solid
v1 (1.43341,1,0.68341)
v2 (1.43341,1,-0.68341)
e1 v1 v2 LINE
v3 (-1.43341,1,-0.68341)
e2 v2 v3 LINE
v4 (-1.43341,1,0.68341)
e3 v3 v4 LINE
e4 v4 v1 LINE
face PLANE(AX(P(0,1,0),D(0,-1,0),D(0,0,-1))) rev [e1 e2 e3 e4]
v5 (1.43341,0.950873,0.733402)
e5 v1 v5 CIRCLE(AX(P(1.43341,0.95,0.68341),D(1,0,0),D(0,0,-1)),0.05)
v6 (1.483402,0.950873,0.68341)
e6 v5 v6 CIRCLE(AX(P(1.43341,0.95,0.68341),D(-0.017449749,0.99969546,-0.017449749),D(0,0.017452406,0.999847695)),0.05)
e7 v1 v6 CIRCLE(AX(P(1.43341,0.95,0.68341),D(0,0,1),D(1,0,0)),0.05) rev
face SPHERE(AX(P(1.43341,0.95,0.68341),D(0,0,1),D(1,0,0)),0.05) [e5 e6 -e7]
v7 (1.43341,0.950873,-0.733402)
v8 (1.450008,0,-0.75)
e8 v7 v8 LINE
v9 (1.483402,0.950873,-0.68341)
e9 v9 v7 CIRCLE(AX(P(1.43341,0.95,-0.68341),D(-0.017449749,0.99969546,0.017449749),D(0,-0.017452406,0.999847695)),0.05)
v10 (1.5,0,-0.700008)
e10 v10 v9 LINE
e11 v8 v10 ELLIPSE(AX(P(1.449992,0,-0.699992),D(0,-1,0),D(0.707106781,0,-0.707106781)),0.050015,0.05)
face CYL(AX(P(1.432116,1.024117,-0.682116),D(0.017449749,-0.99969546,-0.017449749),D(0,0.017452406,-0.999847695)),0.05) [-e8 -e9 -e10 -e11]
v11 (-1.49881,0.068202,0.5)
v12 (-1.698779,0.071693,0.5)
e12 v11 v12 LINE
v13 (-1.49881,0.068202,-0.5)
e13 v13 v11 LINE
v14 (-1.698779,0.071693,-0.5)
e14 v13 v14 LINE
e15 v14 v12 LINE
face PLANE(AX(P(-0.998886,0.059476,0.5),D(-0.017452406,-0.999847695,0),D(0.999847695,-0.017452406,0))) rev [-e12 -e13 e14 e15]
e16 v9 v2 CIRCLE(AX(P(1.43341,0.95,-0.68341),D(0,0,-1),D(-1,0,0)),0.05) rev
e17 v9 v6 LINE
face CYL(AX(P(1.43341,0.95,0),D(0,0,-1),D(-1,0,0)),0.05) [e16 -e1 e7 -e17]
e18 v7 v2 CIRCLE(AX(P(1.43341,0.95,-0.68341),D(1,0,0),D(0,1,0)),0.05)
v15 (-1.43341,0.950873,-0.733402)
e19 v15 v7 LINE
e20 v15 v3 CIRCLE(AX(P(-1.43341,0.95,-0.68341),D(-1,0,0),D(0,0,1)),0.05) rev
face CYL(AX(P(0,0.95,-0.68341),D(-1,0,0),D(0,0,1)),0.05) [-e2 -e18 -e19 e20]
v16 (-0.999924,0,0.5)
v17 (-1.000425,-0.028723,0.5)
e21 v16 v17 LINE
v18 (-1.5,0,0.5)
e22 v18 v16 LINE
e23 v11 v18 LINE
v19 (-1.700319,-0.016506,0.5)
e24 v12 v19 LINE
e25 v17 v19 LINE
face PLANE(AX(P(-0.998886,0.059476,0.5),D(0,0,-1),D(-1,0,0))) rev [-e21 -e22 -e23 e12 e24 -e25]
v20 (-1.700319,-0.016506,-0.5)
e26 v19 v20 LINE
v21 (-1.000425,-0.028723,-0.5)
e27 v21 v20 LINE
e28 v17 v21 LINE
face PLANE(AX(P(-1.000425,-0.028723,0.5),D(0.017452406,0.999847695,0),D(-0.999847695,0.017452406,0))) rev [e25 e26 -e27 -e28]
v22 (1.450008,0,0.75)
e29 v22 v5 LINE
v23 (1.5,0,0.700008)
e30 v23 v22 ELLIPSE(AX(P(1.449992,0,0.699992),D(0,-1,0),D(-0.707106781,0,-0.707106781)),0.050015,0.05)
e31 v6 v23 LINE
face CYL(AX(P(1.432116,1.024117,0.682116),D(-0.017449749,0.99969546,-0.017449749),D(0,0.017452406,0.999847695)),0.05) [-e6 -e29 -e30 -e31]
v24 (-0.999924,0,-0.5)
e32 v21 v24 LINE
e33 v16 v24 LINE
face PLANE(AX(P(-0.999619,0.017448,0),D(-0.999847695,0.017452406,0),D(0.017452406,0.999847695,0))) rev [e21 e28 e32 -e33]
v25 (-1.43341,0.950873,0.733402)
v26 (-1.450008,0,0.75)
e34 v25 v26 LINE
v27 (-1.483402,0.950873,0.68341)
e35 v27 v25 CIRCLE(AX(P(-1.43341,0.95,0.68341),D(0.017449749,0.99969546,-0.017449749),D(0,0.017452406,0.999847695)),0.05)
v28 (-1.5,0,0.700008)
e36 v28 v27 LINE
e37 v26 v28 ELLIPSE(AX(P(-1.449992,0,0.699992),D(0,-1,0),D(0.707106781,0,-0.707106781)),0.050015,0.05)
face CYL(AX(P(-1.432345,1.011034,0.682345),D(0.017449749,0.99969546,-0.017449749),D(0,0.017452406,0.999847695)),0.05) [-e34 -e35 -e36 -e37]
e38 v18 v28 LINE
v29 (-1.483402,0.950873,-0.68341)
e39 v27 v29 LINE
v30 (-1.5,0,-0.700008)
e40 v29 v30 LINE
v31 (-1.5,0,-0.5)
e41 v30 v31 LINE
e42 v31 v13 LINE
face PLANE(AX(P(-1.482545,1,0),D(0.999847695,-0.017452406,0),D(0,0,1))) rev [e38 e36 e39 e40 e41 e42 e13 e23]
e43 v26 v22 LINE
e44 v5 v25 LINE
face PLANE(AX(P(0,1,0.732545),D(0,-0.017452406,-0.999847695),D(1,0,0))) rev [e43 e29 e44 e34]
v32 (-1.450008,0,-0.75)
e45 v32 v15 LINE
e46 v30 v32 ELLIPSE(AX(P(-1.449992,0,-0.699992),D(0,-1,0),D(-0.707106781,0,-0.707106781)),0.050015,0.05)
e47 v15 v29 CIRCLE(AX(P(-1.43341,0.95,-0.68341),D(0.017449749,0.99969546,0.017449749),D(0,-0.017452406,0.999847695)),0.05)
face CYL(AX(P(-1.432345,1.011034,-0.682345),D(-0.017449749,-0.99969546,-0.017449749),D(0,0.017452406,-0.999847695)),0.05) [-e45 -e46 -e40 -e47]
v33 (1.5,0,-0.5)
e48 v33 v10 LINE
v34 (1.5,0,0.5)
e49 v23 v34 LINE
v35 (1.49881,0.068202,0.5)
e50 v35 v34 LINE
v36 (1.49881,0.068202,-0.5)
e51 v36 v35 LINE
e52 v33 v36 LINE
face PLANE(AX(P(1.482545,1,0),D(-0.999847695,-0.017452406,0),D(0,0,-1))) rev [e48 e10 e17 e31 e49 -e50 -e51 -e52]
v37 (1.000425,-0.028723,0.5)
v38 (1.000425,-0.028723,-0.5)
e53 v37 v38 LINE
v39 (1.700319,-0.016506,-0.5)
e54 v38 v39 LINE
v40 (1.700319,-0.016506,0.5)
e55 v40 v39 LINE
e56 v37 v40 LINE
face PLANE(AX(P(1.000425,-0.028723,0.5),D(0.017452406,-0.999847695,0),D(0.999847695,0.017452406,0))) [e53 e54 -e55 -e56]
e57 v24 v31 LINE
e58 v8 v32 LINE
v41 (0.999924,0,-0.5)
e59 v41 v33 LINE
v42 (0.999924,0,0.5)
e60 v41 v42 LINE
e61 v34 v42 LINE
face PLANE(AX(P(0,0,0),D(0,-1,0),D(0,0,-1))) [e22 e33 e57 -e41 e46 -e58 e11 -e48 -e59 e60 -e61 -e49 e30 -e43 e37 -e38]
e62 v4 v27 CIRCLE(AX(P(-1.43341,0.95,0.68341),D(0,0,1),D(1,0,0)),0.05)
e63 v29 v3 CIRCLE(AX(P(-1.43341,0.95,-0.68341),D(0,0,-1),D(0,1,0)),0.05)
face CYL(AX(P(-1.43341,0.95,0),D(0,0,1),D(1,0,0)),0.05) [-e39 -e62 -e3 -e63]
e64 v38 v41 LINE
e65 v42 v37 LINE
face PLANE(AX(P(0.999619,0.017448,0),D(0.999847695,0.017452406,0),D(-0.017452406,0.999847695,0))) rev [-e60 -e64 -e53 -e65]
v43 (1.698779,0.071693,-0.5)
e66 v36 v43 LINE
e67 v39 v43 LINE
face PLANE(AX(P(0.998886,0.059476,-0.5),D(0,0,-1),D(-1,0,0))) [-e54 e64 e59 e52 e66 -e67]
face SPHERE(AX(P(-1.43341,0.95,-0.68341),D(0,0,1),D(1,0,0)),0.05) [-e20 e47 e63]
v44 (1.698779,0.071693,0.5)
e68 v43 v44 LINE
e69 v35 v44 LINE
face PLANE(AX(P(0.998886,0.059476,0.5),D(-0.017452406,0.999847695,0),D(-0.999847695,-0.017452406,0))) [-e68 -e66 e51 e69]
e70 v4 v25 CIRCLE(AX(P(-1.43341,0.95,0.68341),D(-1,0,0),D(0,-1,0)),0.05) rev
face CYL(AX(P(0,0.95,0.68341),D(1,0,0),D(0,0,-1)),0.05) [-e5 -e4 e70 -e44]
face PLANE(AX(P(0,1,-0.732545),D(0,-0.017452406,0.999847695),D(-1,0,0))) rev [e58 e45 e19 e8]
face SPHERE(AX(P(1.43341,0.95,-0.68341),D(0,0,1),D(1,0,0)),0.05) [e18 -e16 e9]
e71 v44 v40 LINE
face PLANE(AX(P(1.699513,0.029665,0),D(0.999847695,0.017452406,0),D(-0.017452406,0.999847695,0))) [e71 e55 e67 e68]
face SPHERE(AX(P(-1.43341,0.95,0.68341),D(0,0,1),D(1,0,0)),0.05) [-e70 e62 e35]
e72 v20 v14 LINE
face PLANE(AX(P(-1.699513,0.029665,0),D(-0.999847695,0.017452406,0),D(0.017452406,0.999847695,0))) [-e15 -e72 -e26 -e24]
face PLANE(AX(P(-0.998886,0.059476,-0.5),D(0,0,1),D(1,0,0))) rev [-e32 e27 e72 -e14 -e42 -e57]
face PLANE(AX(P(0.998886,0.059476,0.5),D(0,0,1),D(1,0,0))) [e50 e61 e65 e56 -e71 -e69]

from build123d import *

# Parameters (mm, degrees)
SKETCH1_W           = 3
SKETCH1_H           = 1.5
BOSS_EXTRUDE1_DEPTH = 1
CHAMFER1_SIZE       = 1
CHAMFER1_SIZE_2     = 0.017455065
FILLET1_R           = 0.05
BOSS_EXTRUDE2_START = -0.5
SKETCH2_W           = 1
SKETCH2_H           = 0.088212482
BOSS_EXTRUDE2_DEPTH = 0.7


with BuildPart() as part:
    # Sketch1 → Boss-Extrude1 (new body)
    with BuildSketch(Plane(origin=(0, 0, 0), x_dir=(1, 0, 0), z_dir=(0, 1, 0))):
        Rectangle(SKETCH1_W, SKETCH1_H)
    extrude(amount=BOSS_EXTRUDE1_DEPTH)

    # Chamfer1
    # the kernel refuses this chamfer: 1, 0.017455065 mm, written as the material it takes off along each edge
    with BuildSketch(Plane(origin=(-1.5, 1, -3.349985355), x_dir=(-0.0006712501823120682, -0.999999774711571, 0), z_dir=(0, 0, 1)), Plane(origin=(1.5, 1, 3.349985355), x_dir=(0.0006712501823120682, -0.999999774711571, 0), z_dir=(0, 0, -1))) as chamfer1_piece_1:
        Polygon((CHAMFER1_SIZE * 0.999999774712, CHAMFER1_SIZE * 0.000671250182312), (-CHAMFER1_SIZE_2 * 0.000671250179552, CHAMFER1_SIZE_2 * 0.999999770599), (0, 0), align=None)
    extrude(amount=6.699970711, mode=Mode.SUBTRACT)
    with BuildSketch(Plane(origin=(4.099985355, 1, -0.75), x_dir=(0, -0.999999774711571, -0.0006712501823119614), z_dir=(-1, 0, 0)), Plane(origin=(-4.099985355, 1, 0.75), x_dir=(0, -0.999999774711571, 0.0006712501823119614), z_dir=(1, 0, 0))) as chamfer1_piece_2:
        Polygon((CHAMFER1_SIZE * 0.999999774712, CHAMFER1_SIZE * 0.000671250182312), (-CHAMFER1_SIZE_2 * 0.000671250179552, CHAMFER1_SIZE_2 * 0.999999770599), (0, 0), align=None)
    extrude(amount=8.199970711, mode=Mode.SUBTRACT)

    # Fillet1
    fillet1_edges = [part.edges().sort_by_distance(p)[0] for p in [
        (0, 1, 0.732544935),
        (1.482544935, 1, 0),
        (0, 1, -0.732544935),
        (-1.482544935, 1, 0),
        (1.491272468, 0.5, -0.741272468),
        (1.491272468, 0.5, 0.741272468),
        (-1.491272468, 0.5, -0.741272468),
        (-1.491272468, 0.5, 0.741272468),
    ]]
    fillet(fillet1_edges, radius=FILLET1_R)

    # Sketch2 → Boss-Extrude2 (add)
    with BuildSketch(Plane(origin=(1.49954312, 0.026174623, 0), x_dir=(0, 0, -1), z_dir=(0.9998476951563914, 0.01745240643728, 0)).offset(BOSS_EXTRUDE2_START)):
        with Locations((0, -0.002072369)):
            Rectangle(SKETCH2_W, SKETCH2_H)
    boss_extrude2 = extrude(amount=BOSS_EXTRUDE2_DEPTH)

    # Mirror1: Boss-Extrude2 across plane
    add(boss_extrude2.mirror(Plane(origin=(0, 0, 0), x_dir=(0, 0, 1), z_dir=(1, 0, 0))))


solid = part.part
